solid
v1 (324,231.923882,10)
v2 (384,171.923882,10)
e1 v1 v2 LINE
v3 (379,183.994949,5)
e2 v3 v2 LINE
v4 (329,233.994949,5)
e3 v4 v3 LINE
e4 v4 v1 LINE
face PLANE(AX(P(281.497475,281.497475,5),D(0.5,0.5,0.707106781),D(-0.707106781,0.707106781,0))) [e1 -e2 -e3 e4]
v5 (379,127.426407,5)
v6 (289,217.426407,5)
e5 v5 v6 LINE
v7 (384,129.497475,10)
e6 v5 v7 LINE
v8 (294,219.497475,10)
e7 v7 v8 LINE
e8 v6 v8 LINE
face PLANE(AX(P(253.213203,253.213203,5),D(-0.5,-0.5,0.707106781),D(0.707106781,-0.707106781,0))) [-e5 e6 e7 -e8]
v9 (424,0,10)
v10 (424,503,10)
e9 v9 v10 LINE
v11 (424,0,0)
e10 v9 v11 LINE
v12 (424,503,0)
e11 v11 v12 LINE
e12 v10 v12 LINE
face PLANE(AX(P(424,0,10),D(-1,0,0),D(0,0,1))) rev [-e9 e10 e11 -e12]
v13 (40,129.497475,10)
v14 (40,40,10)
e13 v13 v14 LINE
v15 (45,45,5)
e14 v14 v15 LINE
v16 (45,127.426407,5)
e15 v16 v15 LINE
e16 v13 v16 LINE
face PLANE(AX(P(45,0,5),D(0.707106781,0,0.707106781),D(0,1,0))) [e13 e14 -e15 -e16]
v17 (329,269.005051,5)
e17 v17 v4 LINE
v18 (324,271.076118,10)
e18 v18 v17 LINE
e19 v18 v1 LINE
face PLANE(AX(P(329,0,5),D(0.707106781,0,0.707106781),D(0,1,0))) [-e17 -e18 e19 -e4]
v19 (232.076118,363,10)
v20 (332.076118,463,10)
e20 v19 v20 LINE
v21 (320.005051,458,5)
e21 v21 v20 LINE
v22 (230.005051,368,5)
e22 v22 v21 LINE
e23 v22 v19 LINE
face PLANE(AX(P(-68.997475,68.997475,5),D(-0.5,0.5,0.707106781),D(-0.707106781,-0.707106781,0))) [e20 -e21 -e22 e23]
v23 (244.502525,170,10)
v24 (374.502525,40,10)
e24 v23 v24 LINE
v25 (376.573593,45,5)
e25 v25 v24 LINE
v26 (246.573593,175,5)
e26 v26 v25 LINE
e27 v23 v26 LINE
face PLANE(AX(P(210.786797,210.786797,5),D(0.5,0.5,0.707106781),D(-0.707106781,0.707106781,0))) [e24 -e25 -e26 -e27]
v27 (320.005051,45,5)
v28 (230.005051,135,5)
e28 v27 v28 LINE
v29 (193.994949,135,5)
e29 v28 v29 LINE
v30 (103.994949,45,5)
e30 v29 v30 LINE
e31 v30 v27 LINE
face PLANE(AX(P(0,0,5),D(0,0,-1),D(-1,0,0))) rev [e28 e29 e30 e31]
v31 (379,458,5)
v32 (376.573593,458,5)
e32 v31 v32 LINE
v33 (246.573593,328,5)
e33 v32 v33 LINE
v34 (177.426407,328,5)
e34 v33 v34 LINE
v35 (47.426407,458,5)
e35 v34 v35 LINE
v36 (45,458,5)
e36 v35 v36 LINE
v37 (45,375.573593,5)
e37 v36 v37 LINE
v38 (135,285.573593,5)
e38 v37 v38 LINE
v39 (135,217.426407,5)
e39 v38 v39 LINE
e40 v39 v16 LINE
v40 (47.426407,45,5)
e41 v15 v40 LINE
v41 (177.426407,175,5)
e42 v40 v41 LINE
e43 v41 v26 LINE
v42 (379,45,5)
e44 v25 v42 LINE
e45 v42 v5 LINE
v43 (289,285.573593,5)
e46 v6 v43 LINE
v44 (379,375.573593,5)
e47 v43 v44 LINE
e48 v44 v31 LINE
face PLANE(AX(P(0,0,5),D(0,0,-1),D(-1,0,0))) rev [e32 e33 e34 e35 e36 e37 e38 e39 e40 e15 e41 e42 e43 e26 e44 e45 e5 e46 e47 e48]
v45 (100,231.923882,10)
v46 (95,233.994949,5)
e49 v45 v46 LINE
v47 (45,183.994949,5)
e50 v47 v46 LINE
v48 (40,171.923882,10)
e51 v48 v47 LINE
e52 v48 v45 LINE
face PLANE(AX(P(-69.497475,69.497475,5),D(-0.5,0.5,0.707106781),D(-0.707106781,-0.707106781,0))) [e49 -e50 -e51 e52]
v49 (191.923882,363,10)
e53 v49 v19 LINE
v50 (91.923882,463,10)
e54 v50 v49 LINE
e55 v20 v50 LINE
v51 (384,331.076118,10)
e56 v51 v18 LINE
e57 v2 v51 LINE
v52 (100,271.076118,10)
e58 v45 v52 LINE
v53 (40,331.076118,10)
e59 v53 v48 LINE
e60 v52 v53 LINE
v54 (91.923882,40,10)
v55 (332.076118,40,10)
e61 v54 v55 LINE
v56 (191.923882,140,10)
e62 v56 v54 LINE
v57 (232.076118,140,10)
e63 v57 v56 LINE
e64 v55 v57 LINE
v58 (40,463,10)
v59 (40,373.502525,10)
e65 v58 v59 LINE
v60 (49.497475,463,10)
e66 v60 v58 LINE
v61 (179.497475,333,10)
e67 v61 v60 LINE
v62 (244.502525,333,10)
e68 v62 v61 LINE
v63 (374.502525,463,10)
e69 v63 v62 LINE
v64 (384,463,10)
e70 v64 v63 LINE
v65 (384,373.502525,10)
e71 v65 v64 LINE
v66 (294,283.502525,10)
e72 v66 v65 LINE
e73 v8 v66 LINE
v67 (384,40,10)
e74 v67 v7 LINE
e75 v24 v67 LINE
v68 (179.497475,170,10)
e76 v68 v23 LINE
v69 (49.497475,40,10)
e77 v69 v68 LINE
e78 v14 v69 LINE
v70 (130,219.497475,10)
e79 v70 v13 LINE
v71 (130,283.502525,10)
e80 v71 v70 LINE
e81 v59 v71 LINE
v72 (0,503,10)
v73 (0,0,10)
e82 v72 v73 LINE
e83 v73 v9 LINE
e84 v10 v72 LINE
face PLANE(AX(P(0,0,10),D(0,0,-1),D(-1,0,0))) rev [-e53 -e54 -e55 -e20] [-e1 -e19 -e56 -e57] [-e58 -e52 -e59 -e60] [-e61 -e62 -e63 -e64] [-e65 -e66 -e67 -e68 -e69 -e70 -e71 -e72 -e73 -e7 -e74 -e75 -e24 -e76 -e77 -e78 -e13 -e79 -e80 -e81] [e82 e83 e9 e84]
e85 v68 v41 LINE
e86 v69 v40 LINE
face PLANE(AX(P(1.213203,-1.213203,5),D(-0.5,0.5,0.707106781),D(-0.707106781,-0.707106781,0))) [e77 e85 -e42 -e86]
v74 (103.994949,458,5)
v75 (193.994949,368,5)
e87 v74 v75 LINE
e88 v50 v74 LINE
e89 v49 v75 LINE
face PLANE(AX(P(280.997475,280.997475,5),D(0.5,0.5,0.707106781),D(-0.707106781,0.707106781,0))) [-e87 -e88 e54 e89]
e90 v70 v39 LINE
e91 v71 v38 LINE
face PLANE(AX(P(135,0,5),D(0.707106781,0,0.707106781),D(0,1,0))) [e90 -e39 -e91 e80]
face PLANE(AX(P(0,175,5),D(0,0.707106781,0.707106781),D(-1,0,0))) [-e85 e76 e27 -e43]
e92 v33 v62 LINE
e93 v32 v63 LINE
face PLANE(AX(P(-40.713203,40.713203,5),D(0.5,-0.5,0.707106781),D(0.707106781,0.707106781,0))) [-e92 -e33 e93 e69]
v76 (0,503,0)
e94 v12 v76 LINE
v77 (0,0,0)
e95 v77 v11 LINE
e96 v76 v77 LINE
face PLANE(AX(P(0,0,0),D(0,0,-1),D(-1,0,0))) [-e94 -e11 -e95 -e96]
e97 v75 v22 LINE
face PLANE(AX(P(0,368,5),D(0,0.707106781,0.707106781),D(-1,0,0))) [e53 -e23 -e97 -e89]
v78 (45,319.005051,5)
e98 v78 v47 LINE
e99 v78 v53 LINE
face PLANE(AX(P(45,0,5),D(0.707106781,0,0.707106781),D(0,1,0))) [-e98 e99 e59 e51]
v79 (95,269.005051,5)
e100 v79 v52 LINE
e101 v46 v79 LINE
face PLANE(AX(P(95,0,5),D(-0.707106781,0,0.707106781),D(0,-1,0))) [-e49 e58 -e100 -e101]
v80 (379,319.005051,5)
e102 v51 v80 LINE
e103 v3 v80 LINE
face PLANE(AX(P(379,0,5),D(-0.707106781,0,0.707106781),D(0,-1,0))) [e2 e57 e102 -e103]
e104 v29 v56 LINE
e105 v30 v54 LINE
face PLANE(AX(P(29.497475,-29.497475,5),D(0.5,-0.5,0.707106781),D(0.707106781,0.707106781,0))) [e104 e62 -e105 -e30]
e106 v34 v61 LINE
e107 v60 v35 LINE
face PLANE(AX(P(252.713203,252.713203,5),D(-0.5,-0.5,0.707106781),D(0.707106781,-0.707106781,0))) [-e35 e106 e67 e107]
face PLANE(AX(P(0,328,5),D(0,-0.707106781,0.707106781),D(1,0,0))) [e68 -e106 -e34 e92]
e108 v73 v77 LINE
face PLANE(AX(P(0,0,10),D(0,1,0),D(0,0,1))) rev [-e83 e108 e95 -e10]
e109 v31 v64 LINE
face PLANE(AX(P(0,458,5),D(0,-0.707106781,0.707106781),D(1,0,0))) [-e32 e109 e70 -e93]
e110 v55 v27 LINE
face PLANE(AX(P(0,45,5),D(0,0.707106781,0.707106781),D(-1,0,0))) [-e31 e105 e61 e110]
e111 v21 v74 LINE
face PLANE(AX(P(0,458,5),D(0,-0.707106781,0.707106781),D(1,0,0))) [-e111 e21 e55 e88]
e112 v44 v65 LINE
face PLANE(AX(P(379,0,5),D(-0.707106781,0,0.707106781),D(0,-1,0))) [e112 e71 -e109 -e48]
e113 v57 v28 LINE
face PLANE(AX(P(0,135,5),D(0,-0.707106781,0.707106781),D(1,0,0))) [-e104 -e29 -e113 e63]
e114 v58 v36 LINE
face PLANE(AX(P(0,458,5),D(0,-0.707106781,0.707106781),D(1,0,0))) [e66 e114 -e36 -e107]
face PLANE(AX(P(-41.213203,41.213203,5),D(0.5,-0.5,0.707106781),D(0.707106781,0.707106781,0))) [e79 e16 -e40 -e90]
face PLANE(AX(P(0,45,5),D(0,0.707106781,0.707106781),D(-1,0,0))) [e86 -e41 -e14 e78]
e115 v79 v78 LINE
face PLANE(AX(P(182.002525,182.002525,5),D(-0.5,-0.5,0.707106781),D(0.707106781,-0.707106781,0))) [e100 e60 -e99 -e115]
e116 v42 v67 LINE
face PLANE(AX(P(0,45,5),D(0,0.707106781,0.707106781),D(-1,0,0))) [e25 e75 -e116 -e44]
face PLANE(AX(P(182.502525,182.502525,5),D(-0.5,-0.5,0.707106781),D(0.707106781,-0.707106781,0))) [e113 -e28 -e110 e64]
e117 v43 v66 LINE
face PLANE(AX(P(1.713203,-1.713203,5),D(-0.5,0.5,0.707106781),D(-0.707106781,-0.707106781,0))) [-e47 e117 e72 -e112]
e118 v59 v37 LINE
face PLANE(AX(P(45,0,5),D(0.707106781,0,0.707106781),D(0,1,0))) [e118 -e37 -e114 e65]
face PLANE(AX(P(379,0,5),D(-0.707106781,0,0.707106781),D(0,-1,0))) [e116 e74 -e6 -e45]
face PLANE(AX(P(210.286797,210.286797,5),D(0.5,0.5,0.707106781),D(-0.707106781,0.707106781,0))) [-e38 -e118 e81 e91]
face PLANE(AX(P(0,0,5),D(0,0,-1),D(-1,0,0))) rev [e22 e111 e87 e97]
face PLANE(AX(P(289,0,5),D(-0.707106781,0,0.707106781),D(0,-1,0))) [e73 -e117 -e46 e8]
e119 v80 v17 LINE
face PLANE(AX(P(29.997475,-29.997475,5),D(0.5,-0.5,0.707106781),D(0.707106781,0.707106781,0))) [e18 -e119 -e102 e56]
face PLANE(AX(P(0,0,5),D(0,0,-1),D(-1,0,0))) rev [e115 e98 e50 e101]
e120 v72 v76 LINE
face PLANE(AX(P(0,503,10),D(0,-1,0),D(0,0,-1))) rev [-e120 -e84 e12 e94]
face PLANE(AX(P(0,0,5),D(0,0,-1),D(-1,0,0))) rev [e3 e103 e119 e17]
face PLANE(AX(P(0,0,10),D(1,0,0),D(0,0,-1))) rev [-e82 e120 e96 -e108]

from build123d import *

# Parameters (mm, degrees)
ESQUISSE1_W             = 424
ESQUISSE1_H             = 503
BOSS_EXTRU_1_DEPTH      = 10
ENL_V_MAT_EXTRU_1_DEPTH = 5
CHANFREIN1_SIZE         = 5


with BuildPart() as part:
    # Esquisse1 → Boss.-Extru.1 (new body)
    with BuildSketch(Plane.XY):
        with Locations((212, 251.5)):
            Rectangle(ESQUISSE1_W, ESQUISSE1_H)
    extrude(amount=BOSS_EXTRU_1_DEPTH)

    # Esquisse2 → Enlèv. mat.-Extru.1 (cut)
    with BuildSketch(Plane.XY.offset(10)):
        Polygon((100, 231.923881554), (100, 271.076118446), (40, 331.076118446), (40, 171.923881554), align=None)
        Polygon((191.923881554, 363), (232.076118446, 363), (332.076118446, 463), (91.923881554, 463), align=None)
        Polygon((40, 463), (40, 373.502525317), (130, 283.502525317), (130, 219.497474683), (40, 129.497474683), (40, 40), (49.497474683, 40), (179.497474683, 170), (244.502525317, 170), (374.502525317, 40), (384, 40), (384, 129.497474683), (294, 219.497474683), (294, 283.502525317), (384, 373.502525317), (384, 463), (374.502525317, 463), (244.502525317, 333), (179.497474683, 333), (49.497474683, 463), align=None)
        Polygon((324, 231.923881554), (324, 271.076118446), (384, 331.076118446), (384, 171.923881554), align=None)
        Polygon((332.076118446, 40), (91.923881554, 40), (191.923881554, 140), (232.076118446, 140), align=None)
    extrude(amount=-ENL_V_MAT_EXTRU_1_DEPTH, mode=Mode.SUBTRACT)

    # Chanfrein1
    chanfrein1_edges = [part.edges().sort_by_distance(p)[0] for p in [
        (212, 40, 5),
        (141.923881554, 90, 5),
        (212, 140, 5),
        (282.076118446, 90, 5),
        (40, 251.5, 5),
        (70, 301.076118446, 5),
        (100, 251.5, 5),
        (70, 201.923881554, 5),
        (384, 251.5, 5),
        (354, 201.923881554, 5),
        (324, 251.5, 5),
        (354, 301.076118446, 5),
        (114.497474683, 398, 5),
        (212, 333, 5),
        (309.502525317, 398, 5),
        (379.251262658, 463, 5),
        (384, 418.251262658, 5),
        (339, 328.502525317, 5),
        (294, 251.5, 5),
        (339, 174.497474683, 5),
        (384, 84.748737342, 5),
        (379.251262658, 40, 5),
        (309.502525317, 105, 5),
        (212, 170, 5),
        (114.497474683, 105, 5),
        (44.748737342, 40, 5),
        (40, 84.748737342, 5),
        (85, 174.497474683, 5),
        (130, 251.5, 5),
        (85, 328.502525317, 5),
        (40, 418.251262658, 5),
        (44.748737342, 463, 5),
        (212, 463, 5),
        (282.076118446, 413, 5),
        (212, 363, 5),
        (141.923881554, 413, 5),
    ]]
    chamfer(chanfrein1_edges, length=CHANFREIN1_SIZE - 0.0001)  # a hair under: the kernel refuses the full size


solid = part.part
